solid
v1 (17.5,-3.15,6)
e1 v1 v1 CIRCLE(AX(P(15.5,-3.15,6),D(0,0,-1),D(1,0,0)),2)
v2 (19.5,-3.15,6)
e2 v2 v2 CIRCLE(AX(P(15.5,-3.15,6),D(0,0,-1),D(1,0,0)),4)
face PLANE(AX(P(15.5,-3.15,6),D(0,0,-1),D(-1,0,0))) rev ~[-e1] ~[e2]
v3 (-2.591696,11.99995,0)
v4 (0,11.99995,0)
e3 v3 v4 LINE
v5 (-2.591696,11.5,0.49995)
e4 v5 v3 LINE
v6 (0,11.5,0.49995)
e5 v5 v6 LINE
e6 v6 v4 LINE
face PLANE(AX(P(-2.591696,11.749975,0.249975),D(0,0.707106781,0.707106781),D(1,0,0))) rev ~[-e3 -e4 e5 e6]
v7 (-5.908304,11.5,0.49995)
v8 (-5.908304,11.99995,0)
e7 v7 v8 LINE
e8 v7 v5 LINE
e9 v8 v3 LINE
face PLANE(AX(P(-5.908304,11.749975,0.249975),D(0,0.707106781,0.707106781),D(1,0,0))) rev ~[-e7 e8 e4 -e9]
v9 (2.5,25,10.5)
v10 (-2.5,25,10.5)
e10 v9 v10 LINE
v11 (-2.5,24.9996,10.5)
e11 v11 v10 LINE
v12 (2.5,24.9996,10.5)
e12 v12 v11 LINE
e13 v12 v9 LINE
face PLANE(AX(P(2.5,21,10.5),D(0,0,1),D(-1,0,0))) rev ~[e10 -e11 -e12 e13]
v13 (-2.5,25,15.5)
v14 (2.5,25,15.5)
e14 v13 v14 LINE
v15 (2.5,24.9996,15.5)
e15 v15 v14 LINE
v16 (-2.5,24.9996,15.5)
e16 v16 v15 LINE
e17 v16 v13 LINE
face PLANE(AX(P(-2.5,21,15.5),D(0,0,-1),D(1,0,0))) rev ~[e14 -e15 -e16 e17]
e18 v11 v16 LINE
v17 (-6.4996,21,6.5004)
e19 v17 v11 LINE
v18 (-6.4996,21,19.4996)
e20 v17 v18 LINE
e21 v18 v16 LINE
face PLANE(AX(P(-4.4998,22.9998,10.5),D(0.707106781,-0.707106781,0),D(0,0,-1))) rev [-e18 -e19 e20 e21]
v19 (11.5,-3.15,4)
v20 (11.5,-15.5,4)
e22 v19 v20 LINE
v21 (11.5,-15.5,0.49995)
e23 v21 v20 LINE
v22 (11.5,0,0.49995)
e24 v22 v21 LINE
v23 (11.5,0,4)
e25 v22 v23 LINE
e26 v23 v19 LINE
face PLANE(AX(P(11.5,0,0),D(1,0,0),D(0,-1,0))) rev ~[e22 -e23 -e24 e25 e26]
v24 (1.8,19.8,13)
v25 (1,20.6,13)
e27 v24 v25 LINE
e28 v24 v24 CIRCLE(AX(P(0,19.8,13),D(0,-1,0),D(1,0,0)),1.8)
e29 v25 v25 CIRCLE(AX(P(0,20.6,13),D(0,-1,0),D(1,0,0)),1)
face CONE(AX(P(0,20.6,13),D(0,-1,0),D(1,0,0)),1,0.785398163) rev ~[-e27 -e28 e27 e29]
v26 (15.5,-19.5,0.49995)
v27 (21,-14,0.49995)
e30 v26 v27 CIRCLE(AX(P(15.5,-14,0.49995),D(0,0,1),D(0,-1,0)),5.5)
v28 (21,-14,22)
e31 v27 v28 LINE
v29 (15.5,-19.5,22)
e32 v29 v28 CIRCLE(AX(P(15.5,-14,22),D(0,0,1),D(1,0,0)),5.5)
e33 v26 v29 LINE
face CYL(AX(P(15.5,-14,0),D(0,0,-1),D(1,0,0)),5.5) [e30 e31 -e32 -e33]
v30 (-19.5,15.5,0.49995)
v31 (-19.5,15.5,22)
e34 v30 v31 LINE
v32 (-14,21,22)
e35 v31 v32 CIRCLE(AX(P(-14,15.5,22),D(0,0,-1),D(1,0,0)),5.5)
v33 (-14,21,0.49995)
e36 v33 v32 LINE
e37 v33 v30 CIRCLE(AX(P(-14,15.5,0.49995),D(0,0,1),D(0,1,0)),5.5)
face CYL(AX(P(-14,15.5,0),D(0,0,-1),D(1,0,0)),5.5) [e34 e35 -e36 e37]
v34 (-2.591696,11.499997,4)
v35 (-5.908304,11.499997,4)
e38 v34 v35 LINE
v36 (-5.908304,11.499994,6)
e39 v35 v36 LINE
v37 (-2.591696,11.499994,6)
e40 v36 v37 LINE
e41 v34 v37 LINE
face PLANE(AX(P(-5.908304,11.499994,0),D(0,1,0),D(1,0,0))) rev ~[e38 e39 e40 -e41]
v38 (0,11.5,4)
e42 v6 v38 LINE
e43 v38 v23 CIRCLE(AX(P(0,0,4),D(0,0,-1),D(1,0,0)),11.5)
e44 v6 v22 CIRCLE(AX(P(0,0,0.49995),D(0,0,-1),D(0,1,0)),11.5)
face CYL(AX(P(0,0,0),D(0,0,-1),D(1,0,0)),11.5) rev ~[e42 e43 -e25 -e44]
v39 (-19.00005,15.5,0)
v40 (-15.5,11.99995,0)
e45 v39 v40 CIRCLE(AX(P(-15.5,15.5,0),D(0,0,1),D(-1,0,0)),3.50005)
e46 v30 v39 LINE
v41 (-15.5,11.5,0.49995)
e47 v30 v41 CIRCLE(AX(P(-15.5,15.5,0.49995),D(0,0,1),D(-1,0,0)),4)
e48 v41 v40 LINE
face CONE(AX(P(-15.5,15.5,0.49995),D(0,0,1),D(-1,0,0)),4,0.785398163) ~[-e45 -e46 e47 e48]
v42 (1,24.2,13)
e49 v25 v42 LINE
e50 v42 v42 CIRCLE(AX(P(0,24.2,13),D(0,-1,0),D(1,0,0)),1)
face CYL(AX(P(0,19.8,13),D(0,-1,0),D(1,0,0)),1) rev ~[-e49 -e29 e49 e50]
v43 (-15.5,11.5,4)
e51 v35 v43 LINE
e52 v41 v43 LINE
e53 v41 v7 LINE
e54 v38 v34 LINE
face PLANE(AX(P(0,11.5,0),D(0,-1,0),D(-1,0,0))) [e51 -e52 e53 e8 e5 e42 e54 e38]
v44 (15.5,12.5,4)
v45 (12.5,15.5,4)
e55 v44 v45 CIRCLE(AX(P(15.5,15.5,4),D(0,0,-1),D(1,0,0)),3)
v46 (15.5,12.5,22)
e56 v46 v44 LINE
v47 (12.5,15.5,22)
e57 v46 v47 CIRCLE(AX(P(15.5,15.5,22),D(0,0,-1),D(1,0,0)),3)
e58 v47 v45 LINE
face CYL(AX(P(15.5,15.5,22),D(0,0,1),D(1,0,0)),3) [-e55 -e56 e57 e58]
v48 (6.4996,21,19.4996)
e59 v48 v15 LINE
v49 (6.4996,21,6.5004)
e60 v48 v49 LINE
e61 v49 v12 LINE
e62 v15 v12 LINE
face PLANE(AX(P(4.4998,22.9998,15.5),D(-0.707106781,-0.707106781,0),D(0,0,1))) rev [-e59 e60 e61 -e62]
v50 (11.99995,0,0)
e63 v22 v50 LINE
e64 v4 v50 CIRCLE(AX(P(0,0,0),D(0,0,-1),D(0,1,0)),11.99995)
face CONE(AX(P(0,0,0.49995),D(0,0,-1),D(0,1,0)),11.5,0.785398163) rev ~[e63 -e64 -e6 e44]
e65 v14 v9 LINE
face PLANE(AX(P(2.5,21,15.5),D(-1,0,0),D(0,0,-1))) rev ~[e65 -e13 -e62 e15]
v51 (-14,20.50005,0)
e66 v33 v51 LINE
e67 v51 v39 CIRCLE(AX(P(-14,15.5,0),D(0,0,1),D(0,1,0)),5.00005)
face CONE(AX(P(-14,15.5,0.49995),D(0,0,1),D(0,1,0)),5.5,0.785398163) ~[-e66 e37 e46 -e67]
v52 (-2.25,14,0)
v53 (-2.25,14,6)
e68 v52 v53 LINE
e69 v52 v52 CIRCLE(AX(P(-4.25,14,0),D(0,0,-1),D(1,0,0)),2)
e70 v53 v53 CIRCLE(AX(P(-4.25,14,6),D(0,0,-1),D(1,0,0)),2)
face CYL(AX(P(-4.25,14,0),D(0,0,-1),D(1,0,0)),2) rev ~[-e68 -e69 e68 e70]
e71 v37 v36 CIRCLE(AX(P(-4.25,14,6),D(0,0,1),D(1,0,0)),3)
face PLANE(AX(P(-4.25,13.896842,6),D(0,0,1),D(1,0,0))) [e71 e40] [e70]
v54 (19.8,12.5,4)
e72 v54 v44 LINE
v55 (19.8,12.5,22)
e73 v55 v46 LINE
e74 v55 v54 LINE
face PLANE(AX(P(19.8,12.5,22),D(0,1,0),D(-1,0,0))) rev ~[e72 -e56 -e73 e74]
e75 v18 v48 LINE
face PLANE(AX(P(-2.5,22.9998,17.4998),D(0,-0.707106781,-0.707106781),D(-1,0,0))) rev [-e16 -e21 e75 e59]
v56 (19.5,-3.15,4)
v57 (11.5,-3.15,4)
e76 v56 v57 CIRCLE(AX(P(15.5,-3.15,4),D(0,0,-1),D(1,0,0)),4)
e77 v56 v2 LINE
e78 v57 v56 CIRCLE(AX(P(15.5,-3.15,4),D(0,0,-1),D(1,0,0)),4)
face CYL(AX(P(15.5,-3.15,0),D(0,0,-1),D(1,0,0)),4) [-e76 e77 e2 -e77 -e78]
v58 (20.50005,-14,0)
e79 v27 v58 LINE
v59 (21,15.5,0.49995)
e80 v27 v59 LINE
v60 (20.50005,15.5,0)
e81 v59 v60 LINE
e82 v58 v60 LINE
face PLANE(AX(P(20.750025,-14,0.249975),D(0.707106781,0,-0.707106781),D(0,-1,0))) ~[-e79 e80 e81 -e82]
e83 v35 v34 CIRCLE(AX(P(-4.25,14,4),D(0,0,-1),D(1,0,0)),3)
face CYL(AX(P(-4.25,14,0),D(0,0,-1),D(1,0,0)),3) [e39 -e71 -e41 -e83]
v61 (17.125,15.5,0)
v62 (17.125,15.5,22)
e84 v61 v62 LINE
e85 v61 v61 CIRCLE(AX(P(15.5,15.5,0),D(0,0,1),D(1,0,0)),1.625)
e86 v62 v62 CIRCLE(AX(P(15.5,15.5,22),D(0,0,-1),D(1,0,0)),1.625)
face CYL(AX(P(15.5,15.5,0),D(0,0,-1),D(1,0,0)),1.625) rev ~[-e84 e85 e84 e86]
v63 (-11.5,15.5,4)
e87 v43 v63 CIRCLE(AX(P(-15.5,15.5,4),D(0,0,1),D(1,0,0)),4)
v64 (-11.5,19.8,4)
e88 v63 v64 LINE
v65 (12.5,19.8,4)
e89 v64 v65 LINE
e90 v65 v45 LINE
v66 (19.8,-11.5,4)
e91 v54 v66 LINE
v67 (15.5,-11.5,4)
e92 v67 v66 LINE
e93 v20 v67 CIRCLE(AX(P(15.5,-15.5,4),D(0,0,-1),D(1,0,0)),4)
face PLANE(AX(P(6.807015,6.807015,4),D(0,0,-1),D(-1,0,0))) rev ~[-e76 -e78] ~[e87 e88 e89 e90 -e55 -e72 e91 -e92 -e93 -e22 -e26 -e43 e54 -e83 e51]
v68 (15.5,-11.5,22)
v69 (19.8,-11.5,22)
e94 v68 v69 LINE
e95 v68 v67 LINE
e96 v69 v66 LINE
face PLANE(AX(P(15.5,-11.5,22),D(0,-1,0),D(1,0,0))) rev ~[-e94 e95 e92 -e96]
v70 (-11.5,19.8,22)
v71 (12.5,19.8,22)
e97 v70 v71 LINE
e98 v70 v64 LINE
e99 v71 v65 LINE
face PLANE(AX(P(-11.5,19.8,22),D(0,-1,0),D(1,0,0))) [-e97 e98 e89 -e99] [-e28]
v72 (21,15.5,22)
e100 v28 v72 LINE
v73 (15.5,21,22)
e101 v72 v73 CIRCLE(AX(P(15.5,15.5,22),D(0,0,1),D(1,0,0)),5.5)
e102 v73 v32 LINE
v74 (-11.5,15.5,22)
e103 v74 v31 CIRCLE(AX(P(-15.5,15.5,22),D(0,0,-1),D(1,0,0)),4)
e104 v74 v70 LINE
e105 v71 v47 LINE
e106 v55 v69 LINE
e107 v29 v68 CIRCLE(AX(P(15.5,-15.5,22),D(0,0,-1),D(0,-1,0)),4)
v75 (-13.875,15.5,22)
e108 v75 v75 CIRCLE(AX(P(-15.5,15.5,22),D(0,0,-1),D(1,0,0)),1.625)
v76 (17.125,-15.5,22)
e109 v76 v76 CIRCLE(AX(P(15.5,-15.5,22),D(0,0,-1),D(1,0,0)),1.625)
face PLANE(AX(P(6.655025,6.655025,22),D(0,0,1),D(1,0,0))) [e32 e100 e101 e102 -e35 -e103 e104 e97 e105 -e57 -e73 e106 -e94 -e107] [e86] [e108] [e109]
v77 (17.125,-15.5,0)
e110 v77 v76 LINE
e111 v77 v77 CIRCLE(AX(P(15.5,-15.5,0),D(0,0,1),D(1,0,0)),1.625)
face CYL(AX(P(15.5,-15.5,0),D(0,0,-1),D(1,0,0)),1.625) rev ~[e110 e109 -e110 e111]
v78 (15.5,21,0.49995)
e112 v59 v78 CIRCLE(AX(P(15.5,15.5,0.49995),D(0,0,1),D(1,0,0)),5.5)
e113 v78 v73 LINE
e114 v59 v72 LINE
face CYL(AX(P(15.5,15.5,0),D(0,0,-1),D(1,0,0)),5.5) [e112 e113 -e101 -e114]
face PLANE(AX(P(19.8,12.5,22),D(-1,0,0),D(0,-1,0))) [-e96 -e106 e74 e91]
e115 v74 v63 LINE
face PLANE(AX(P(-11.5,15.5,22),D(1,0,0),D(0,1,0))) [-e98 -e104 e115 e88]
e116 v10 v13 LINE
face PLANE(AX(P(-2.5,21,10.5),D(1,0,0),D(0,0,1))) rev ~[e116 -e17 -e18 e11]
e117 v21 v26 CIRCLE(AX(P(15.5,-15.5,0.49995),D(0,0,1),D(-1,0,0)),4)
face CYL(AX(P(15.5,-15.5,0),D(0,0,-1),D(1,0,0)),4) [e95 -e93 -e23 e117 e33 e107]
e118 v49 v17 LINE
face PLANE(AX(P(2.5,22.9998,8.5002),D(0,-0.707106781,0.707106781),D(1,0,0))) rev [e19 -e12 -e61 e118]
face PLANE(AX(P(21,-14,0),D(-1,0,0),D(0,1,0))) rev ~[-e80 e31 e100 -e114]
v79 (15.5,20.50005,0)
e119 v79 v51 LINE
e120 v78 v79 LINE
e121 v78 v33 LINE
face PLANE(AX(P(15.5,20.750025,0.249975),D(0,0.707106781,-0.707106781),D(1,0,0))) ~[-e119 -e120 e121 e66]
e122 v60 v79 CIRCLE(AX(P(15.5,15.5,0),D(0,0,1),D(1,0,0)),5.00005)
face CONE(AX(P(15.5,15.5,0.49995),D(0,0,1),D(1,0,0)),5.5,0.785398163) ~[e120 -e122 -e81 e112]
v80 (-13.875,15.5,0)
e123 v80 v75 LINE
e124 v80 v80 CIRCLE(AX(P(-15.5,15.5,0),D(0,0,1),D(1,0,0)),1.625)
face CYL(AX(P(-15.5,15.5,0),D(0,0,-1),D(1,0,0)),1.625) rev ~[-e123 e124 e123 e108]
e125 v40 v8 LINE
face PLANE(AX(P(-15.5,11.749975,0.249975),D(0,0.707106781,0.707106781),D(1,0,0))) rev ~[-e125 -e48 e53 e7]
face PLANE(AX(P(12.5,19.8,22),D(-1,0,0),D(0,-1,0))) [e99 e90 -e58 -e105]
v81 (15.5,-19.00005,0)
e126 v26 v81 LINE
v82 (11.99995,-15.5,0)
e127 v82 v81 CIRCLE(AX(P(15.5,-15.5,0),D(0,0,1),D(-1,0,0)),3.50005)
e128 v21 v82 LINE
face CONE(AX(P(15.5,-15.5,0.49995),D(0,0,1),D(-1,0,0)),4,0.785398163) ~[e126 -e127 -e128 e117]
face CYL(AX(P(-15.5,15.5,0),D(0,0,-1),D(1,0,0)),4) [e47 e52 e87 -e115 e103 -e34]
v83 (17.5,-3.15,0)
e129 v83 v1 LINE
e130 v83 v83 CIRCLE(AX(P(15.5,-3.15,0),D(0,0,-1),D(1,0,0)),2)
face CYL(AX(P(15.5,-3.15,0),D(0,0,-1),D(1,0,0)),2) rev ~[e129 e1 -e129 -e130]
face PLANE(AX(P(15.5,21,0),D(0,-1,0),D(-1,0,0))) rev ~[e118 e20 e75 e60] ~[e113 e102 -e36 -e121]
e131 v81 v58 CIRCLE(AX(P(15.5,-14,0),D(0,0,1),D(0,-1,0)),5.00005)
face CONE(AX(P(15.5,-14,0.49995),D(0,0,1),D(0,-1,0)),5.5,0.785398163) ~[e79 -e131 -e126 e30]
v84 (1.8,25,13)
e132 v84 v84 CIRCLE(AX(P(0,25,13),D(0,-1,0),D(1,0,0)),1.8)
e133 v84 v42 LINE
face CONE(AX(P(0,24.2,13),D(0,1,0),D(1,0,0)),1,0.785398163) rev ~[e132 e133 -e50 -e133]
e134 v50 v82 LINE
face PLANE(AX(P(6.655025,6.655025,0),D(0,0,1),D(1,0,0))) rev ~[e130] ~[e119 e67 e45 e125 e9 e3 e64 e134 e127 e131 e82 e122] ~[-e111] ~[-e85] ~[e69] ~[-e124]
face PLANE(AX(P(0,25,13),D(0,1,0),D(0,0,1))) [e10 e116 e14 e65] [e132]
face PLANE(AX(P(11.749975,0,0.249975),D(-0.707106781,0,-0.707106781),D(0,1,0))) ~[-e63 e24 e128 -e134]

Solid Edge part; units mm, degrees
sketch "Sketch1" plane through (0, 0, 0) normal (0, 0, 1) x (1, 0, 0)
  line L0 (11.5, 0) -> (11.5, -15.5)
  arc A0 (11.5, -15.5) -> (15.5, -19.5) centre (15.5, -15.5) ccw
  arc A1 (15.5, -19.5) -> (21, -14) centre (15.5, -14) ccw
  line L1 (21, -14) -> (21, 15.5)
  arc A2 (21, 15.5) -> (15.5, 21) centre (15.5, 15.5) ccw
  line L2 (15.5, 21) -> (-14, 21)
  arc A3 (-19.5, 15.5) -> (-14, 21) centre (-14, 15.5) cw
  arc A4 (-15.5, 11.5) -> (-19.5, 15.5) centre (-15.5, 15.5) cw
  line L3 (0, 11.5) -> (-15.5, 11.5)
  arc A5 (0, 11.5) -> (11.5, 0) centre (0, 0) cw
extrude "Protrusion1" add sketch "Sketch1" along normal blind 22
sketch "Sketch2" plane through (0.75, 0.75, 22) normal (0, 0, 1) x (1, 0, 0)
  line L0 (-0.75, 10.75) -> (-16.25, 10.75)
  arc A0 (-16.25, 10.75) -> (-12.25, 14.75) centre (-16.25, 14.75) ccw
  line L1 (-12.25, 14.75) -> (-12.25, 19.05)
  line L2 (-12.25, 19.05) -> (11.75, 19.05)
  line L3 (11.75, 19.05) -> (11.75, 14.75)
  arc A1 (14.75, 11.75) -> (11.75, 14.75) centre (14.75, 14.75) cw
  line L4 (19.05, 11.75) -> (14.75, 11.75)
  line L5 (19.05, 11.75) -> (19.05, -12.25)
  line L6 (14.75, -12.25) -> (19.05, -12.25)
  arc A2 (10.75, -16.25) -> (14.75, -12.25) centre (14.75, -16.25) cw
  line L7 (10.75, -0.75) -> (10.75, -16.25)
  arc A3 (-0.75, 10.75) -> (10.75, -0.75) centre (-0.75, -0.75) cw
extrude "VaciadoExtruido_1" cut sketch "Sketch2" against normal blind 18
sketch "Sketch3" plane through (0, 0, 0) normal (0, 0, 1) x (1, 0, 0)
  circle A0 centre (-15.5, 15.5) radius 1.625
  circle A1 centre (15.5, 15.5) radius 1.625
  circle A2 centre (15.5, -15.5) radius 1.625
  dimension "D1" = 31
  dimension "D2" = 31
  dimension "D3" = 11.5
  dimension "D4" = 3.25
  dimension "D5" = 3.25
  dimension "D6" = 3.25
  dimension "D7" = 4
  dimension "D8" = 4
  dimension "D9" = 5.5
  dimension "D10" = 5.5
  dimension "D11" = 5.5
  dimension "D12" = 4.25
  dimension "D13" = 14
  dimension "D14" = 3.15
extrude "Cutout1" cut sketch "Sketch3" along normal through all
sketch "Sketch4" plane through (0.75, 21, 10.5) normal (0, 1, 0) x (-1, 0, 0)
  line L0 (-1.75, 0) -> (3.25, 0)
  line L1 (3.25, 0) -> (3.25, 5)
  line L2 (3.25, 5) -> (-1.75, 5)
  line L3 (-1.75, 5) -> (-1.75, 0)
extrude "ProtrusiónExtruida_2" add sketch "Sketch4" along normal blind 4
chamfer "Chaflán_1" distance 4 angle 45 4 edges at (-2.5, 21, 13) (0, 21, 15.5) (0, 21, 10.5) (2.5, 21, 13)
sketch "Sketch5" plane through (0.5, 19.8, 12) normal (0, -1, 0) x (1, 0, 0)
  circle A0 centre (-0.5, 1) radius 1
extrude "Cutout2" cut sketch "Sketch5" against normal through all
chamfer "Chaflán_2" distance 0.8 angle 45 2 edges at (0, 25, 12) (-1, 19.8, 13)
sketch "Sketch6" plane through (0.75, 0.75, 0) normal (0, 0, -1) x (1, 0, 0)
  line L0 (-6.6583, -10.75) -> (-3.3417, -10.75)
  arc A0 (-3.3417, -10.75) -> (-6.6583, -10.75) centre (-5, -13.25) cw
  circle A1 centre (14.75, 3.9) radius 4
extrude "Protrusion2" add sketch "Sketch6" against normal blind 6
sketch "Sketch7" plane through (0.75, 0.75, 0) normal (0, 0, -1) x (1, 0, 0)
  circle A0 centre (-5, -13.25) radius 2
  circle A1 centre (14.75, 3.9) radius 2
  dimension "D1" = 4
  dimension "D2" = 4
  dimension "D3" = 6
  dimension "D4" = 8
extrude "Cutout3" cut sketch "Sketch7" against normal through all
chamfer "Chaflán_4" distance 0.5 angle 45 10 edges at (8.1317, 8.1317, 0) (11.5, -7.75, 0) (12.6716, -18.3284, 0) (19.3891, -17.8891, 0) (21, 0.75, 0) (19.3891, 19.3891, 0) (0.75, 21, 0) (-17.8891, 19.3891, 0) (-18.3284, 12.6716, 0) (-7.75, 11.5, 0)
